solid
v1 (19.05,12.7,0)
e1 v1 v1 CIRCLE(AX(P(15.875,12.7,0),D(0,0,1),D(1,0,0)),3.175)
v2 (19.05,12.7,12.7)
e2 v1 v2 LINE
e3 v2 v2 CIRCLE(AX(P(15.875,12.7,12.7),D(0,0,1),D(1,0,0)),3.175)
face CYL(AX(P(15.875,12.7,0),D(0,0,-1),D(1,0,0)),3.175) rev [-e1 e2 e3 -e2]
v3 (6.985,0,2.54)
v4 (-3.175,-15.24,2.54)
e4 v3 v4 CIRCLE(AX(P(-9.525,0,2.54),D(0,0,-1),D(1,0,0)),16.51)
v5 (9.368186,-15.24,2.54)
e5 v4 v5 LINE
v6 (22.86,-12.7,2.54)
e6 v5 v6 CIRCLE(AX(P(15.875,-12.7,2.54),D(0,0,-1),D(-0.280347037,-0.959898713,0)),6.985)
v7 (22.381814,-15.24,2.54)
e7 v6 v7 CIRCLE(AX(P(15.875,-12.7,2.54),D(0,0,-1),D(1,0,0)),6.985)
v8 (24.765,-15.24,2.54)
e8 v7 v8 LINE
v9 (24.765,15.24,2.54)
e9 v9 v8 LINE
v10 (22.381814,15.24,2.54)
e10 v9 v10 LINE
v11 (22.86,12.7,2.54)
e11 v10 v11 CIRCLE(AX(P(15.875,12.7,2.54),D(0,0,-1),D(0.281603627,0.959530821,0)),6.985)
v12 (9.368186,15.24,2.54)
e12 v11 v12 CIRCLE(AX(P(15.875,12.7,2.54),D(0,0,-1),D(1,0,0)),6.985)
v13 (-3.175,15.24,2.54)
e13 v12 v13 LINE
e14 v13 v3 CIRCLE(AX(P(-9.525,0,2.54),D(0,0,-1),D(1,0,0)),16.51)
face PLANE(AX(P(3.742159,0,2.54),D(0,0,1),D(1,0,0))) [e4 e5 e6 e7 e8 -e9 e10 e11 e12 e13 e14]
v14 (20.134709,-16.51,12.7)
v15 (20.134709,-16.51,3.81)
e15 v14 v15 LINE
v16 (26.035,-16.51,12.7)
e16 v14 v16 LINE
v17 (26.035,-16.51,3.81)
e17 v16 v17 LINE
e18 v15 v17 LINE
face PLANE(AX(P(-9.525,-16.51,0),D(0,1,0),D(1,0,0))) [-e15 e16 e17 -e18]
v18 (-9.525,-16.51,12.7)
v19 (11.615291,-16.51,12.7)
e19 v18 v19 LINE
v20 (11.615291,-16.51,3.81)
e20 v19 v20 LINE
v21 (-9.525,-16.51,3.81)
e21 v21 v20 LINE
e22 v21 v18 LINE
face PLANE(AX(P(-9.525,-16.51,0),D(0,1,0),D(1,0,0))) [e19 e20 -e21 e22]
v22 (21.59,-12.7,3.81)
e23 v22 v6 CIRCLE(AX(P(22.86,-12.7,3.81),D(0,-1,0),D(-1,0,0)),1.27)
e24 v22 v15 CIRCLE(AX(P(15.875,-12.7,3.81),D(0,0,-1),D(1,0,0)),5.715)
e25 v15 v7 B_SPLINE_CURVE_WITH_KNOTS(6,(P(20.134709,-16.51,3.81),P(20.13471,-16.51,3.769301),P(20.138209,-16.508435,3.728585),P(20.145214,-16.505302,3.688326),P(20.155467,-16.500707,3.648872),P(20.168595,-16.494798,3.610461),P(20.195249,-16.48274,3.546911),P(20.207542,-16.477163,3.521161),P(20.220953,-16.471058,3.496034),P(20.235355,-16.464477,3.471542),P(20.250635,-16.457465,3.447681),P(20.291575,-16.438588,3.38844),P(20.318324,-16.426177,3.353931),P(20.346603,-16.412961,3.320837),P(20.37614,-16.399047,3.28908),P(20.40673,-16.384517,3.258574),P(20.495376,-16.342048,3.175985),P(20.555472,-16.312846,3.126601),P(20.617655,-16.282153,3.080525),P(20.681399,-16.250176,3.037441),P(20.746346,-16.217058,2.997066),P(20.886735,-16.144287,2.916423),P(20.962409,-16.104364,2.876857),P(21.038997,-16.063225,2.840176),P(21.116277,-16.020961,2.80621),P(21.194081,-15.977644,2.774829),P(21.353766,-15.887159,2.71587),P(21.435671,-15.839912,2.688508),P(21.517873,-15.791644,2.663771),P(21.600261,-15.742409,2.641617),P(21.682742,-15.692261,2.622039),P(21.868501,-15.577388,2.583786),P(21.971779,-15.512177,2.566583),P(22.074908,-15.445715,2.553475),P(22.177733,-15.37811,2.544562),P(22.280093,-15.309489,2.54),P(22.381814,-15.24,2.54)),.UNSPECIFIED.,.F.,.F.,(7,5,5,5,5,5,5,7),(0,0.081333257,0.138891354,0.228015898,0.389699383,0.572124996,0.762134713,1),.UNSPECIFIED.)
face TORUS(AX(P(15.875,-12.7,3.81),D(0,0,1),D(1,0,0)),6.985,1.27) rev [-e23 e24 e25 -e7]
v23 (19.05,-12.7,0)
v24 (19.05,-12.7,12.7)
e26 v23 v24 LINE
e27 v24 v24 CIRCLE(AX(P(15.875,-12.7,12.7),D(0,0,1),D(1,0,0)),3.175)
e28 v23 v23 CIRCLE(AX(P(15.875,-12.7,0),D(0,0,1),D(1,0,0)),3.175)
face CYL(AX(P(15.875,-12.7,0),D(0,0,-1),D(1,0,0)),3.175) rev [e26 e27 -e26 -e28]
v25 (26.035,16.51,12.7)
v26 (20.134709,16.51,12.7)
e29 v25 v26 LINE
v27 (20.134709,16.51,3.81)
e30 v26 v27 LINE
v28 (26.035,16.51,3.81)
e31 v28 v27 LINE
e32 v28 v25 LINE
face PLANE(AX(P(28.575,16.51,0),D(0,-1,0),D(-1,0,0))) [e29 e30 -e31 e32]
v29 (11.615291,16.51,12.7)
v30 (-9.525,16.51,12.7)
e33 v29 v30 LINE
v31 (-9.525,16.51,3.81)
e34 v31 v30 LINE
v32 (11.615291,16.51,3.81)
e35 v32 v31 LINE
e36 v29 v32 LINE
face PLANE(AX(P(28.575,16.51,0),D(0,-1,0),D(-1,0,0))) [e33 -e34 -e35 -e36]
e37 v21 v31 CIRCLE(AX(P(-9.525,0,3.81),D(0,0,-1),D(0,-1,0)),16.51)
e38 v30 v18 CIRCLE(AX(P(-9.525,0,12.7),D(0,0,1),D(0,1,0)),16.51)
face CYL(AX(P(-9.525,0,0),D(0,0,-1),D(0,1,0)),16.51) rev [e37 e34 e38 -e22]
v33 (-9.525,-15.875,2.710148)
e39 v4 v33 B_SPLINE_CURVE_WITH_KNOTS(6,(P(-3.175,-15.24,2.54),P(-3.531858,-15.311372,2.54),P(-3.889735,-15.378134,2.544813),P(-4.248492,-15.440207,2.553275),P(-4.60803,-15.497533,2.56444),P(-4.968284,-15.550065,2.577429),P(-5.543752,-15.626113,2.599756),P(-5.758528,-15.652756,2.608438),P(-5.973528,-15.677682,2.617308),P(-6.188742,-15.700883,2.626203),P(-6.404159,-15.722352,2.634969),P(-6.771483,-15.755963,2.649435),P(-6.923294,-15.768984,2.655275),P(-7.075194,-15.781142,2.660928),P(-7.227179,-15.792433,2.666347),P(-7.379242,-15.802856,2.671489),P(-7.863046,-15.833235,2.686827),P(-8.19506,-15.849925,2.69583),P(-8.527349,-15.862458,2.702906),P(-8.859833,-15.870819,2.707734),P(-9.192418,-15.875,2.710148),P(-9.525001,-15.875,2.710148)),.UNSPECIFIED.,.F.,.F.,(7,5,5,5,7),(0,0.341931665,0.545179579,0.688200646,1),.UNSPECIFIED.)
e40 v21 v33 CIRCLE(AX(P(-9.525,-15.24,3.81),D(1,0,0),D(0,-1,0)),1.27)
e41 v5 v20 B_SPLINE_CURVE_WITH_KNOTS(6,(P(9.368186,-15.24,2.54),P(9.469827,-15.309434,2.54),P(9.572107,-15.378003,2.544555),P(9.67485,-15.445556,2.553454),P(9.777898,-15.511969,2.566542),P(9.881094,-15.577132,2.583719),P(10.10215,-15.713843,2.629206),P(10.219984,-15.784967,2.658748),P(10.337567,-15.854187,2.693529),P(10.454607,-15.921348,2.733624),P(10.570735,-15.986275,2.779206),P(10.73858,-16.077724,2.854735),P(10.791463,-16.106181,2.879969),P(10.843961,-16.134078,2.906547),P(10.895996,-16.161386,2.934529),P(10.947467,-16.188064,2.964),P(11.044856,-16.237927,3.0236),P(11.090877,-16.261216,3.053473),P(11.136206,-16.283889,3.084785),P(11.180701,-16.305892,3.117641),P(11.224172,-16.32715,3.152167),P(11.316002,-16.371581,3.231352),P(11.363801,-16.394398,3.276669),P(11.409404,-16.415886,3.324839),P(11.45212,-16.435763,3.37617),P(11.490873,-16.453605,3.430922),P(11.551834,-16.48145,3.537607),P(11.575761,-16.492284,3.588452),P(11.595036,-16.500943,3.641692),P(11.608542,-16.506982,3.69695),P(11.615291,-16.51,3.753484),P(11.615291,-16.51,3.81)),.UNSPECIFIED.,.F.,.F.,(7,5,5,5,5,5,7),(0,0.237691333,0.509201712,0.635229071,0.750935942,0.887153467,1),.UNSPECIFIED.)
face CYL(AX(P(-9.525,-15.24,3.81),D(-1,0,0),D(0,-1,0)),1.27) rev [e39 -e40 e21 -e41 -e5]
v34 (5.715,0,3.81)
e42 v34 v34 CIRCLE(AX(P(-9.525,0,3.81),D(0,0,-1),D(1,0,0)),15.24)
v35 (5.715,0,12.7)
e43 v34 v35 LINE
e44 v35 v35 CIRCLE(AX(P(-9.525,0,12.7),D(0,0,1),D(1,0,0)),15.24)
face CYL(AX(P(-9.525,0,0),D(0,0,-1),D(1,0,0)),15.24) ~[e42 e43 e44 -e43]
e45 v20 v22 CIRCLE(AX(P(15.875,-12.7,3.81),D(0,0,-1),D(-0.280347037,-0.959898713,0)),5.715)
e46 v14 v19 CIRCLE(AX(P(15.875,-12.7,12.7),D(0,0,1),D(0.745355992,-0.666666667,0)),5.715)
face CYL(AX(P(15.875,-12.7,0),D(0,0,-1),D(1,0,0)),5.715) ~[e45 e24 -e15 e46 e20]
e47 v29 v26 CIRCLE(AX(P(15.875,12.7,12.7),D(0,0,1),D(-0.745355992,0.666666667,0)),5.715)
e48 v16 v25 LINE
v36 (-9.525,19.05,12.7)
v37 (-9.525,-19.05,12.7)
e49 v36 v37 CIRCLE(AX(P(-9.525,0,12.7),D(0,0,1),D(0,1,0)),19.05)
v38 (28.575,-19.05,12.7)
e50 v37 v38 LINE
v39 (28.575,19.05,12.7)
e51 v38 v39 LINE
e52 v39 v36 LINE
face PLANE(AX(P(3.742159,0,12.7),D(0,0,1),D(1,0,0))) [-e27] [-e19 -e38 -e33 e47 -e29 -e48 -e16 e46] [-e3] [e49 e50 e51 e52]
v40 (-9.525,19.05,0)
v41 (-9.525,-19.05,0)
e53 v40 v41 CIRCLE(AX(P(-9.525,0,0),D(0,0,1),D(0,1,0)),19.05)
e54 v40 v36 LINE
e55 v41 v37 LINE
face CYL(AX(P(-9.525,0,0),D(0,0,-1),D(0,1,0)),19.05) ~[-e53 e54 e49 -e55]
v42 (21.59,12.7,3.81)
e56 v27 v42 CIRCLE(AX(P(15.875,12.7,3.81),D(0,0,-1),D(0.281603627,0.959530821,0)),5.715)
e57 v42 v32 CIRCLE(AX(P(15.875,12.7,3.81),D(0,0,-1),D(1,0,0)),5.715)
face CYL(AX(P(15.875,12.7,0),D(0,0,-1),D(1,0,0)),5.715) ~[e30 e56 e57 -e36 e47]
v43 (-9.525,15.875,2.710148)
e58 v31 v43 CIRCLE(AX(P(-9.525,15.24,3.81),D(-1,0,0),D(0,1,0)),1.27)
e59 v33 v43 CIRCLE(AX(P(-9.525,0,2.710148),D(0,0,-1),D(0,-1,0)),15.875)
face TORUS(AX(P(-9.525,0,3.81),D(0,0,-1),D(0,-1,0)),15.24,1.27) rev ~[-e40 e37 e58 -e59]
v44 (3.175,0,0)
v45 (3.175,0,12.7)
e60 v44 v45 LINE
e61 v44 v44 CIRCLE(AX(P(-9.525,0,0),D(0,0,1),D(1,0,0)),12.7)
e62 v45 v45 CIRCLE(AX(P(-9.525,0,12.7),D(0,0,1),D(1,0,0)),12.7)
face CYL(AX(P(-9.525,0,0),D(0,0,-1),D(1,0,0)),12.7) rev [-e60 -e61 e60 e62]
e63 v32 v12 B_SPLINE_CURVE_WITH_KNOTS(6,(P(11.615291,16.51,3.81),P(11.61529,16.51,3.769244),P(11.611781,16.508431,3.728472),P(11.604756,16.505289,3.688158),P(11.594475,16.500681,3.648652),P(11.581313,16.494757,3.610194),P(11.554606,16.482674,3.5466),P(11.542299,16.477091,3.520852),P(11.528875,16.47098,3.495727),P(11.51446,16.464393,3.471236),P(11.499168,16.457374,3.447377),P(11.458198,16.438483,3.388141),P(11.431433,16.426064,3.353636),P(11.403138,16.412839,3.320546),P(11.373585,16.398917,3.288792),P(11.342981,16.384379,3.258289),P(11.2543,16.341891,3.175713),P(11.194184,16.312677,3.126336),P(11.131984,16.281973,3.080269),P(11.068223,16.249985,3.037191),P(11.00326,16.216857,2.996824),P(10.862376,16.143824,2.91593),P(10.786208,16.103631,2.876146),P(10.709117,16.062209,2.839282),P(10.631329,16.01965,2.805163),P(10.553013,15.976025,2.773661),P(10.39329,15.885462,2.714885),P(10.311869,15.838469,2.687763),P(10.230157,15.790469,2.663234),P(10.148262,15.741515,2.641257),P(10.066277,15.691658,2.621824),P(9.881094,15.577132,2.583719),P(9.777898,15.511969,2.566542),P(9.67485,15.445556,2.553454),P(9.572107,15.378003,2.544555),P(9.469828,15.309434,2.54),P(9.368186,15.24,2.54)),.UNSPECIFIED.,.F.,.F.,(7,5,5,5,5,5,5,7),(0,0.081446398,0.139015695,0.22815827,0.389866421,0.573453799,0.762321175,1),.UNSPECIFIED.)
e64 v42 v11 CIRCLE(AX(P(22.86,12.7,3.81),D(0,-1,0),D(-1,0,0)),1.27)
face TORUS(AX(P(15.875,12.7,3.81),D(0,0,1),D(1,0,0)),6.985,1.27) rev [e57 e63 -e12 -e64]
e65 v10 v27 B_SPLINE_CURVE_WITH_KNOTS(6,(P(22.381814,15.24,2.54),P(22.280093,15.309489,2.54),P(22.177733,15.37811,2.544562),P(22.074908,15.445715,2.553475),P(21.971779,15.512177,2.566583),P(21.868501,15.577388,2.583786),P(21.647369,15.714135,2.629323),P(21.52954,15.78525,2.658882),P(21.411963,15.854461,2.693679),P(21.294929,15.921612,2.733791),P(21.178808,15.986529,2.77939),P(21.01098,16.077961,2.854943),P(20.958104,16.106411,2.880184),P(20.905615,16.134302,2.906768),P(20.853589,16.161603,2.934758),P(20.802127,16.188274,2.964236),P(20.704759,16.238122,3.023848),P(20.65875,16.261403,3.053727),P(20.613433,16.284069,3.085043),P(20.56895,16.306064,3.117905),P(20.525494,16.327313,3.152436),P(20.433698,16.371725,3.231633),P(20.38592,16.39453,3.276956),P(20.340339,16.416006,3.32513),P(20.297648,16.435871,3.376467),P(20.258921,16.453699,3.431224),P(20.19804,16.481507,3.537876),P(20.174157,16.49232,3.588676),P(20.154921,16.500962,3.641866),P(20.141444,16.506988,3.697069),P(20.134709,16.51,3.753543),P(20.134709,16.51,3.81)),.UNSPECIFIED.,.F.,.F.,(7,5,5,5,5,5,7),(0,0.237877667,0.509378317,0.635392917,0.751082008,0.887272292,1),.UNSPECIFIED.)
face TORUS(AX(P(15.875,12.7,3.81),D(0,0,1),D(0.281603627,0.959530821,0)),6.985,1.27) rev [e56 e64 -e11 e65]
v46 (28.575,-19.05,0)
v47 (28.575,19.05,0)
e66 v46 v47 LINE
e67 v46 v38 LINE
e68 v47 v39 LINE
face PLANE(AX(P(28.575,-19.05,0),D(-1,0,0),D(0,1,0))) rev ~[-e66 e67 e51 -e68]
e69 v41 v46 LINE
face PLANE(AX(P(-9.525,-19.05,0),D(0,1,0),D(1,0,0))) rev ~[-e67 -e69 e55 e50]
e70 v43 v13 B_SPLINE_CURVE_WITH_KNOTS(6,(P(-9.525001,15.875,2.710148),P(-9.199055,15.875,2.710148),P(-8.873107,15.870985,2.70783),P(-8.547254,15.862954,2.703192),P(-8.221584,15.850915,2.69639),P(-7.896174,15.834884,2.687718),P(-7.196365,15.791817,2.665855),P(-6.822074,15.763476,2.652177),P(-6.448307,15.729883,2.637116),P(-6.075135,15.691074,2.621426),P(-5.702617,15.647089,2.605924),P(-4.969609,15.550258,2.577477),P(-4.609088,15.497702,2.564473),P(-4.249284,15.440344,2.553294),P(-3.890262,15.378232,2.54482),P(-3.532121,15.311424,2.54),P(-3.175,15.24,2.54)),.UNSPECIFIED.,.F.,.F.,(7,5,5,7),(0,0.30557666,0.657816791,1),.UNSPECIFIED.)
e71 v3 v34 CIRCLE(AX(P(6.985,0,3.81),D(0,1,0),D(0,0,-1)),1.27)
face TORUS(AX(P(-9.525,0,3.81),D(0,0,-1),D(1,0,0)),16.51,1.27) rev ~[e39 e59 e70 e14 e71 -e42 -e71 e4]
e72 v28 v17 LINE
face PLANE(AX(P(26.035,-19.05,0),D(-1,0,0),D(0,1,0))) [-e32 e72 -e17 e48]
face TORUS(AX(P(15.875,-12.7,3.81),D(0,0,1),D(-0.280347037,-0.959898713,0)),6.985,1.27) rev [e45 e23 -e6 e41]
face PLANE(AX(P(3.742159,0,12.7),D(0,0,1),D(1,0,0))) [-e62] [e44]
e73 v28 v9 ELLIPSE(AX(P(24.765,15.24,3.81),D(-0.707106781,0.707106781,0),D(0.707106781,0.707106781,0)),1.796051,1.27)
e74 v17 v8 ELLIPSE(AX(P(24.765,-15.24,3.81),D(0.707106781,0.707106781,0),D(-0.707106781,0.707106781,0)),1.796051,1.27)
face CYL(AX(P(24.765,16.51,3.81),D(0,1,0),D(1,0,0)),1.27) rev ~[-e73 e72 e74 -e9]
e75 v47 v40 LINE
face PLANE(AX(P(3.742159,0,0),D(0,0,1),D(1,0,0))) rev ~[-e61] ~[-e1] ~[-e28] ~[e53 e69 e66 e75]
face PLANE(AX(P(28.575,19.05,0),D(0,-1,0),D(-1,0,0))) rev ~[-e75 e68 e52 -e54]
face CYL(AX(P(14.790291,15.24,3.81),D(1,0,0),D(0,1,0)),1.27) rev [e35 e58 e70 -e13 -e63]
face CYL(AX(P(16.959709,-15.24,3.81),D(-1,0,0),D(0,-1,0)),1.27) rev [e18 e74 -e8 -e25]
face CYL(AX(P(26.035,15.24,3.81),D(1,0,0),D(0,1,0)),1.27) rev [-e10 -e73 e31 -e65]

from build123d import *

# Parameters (mm, degrees)
F0_R         = 3.175
F0_R_2       = 12.7
F1_DEPTH     = 12.7
F2_T         = -2.54
F3_T1_DEPTH  = 33.02
F3_T6_DEPTH  = 24.3152905029
F3_S7_R      = 5.715
F3_T8_DEPTH  = 14
F3_T12_ANGLE = 253.7190819507
F3_T17_ANGLE = 73.6440624835
F3_T22_DEPTH = 9.0752905029
F3_S23_R     = 5.715
F3_T24_DEPTH = 6
F3_T28_DEPTH = 9.0752905029
F3_S29_R     = 5.715
F3_T30_DEPTH = 6
F3_T34_ANGLE = 73.6440624835
F3_T39_ANGLE = 253.7190819507
F3_T44_DEPTH = 24.3152905029
F3_S45_R     = 5.715
F3_T46_DEPTH = 14
F3_T48_ANGLE = 180


# Not quite as in the source:
# - a fillet or chamfer that OpenCascade refuses, or shapes differently, is made with other operations: its cross-section is extruded or revolved along the edge and cut away or added


with BuildPart() as f1:
    # F0 (on Top) → F1 (new body)
    with BuildSketch(Plane.XY):
        with BuildLine():
            Line((28.575, -19.05), (28.575, 19.05))
            Line((28.575, 19.05), (-9.525, 19.05))
            ThreePointArc((-9.525, 19.05), (-28.575, 0), (-9.525, -19.05))
            Line((-9.525, -19.05), (28.575, -19.05))
        make_face()
        with Locations((15.875, -12.7)):
            Circle(F0_R, mode=Mode.SUBTRACT)
        with Locations((-9.525, 0)):
            Circle(F0_R_2, mode=Mode.SUBTRACT)
        with Locations((15.875, 12.7)):
            Circle(F0_R, mode=Mode.SUBTRACT)
    extrude(amount=F1_DEPTH)

    # F2
    f2_openings = [f1.faces().sort_by_distance(p)[0] for p in [
        (5.241716, 0, 12.7),
    ]]
    offset(amount=F2_T, openings=f2_openings)

    # F3: fillet of radius 1.27 on 11 edges, made by hand

    # F3_s2 → F3_t1 (join)
    with BuildSketch(Plane.XZ.offset(-16.51)):
        with BuildLine():
            ThreePointArc((26.035, 3.81), (25.6630256121, 2.9119743879), (24.765, 2.54))
            Line((24.765, 2.54), (26.035, 2.54))
            Line((26.035, 2.54), (26.035, 3.81))
        make_face()
    extrude(amount=F3_T1_DEPTH)


with BuildPart() as f3_tool4:
    # F3_s5 → F3_t6 (new body)
    with BuildSketch(Plane.YZ.offset(-9.525)):
        with BuildLine():
            ThreePointArc((-16.51, 3.81), (-16.1380256121, 2.9119743879), (-15.24, 2.54))
            Line((-15.24, 2.54), (-16.51, 2.54))
            Line((-16.51, 2.54), (-16.51, 3.81))
        make_face()
    extrude(amount=F3_T6_DEPTH)

    # F3_s7 → F3_t8 (cut, symmetric)
    with BuildSketch(Plane.XY.offset(3.2)):
        with Locations((15.875, -12.7)):
            Circle(F3_S7_R)
    extrude(amount=F3_T8_DEPTH, both=True, mode=Mode.SUBTRACT)


with BuildPart() as f1_1:
    add(f1.part)

    # F3_t3: union F3_tool4
    add(f3_tool4.part)


with BuildPart() as f3_tool10:
    # F3_s11 → F3_t12 (revolve)
    with BuildSketch(Plane(origin=(18.0449433807, -5.2701877221, 0), x_dir=(0, 0, 1), z_dir=(0.9598987128, -0.2803470371, 0))):
        with BuildLine():
            ThreePointArc((3.81, 13.4552044392), (2.9119743879, 13.8271788271), (2.54, 14.7252044392))
            Line((2.54, 14.7252044392), (2.54, 13.4552044392))
            Line((2.54, 13.4552044392), (3.81, 13.4552044392))
        make_face()
    revolve(axis=Axis((15.875, -12.7, 2.54), (0, 0, -1)), revolution_arc=F3_T12_ANGLE)

    split(bisect_by=Plane.XZ.offset(16.51), keep=Keep.BOTTOM)


with BuildPart() as f1_2:
    add(f1_1.part)

    # F3_t9: union F3_tool10
    add(f3_tool10.part)


with BuildPart() as f3_tool15:
    # F3_s16 → F3_t17 (revolve)
    with BuildSketch(Plane.XZ.offset(12.7)):
        with BuildLine():
            ThreePointArc((21.59, 3.81), (21.9619743879, 2.9119743879), (22.86, 2.54))
            Line((22.86, 2.54), (21.59, 2.54))
            Line((21.59, 2.54), (21.59, 3.81))
        make_face()
    revolve(axis=Axis((15.875, -12.7, 2.54), (0, 0, -1)), revolution_arc=F3_T17_ANGLE)

    split(bisect_by=Plane.XZ.offset(16.51), keep=Keep.BOTTOM)


with BuildPart() as f1_3:
    add(f1_2.part)

    # F3_t14: union F3_tool15
    add(f3_tool15.part)


with BuildPart() as f3_tool20:
    # F3_s21 → F3_t22 (new body)
    with BuildSketch(Plane.YZ.offset(16.9597094971)):
        with BuildLine():
            ThreePointArc((-16.51, 3.81), (-16.1380256121, 2.9119743879), (-15.24, 2.54))
            Line((-15.24, 2.54), (-16.51, 2.54))
            Line((-16.51, 2.54), (-16.51, 3.81))
        make_face()
    extrude(amount=F3_T22_DEPTH)

    # F3_s23 → F3_t24 (cut, symmetric)
    with BuildSketch(Plane.XY.offset(3.2)):
        with Locations((15.875, -12.7)):
            Circle(F3_S23_R)
    extrude(amount=F3_T24_DEPTH, both=True, mode=Mode.SUBTRACT)


with BuildPart() as f1_4:
    add(f1_3.part)

    # F3_t19: union F3_tool20
    add(f3_tool20.part)


with BuildPart() as f3_tool26:
    # F3_s27 → F3_t28 (new body)
    with BuildSketch(Plane.YZ.offset(26.035)):
        with BuildLine():
            ThreePointArc((16.51, 3.81), (16.1380256121, 2.9119743879), (15.24, 2.54))
            Line((15.24, 2.54), (16.51, 2.54))
            Line((16.51, 2.54), (16.51, 3.81))
        make_face()
    extrude(amount=-F3_T28_DEPTH)

    # F3_s29 → F3_t30 (cut, symmetric)
    with BuildSketch(Plane.XY.offset(3.2)):
        with Locations((15.875, 12.7)):
            Circle(F3_S29_R)
    extrude(amount=F3_T30_DEPTH, both=True, mode=Mode.SUBTRACT)


with BuildPart() as f1_5:
    add(f1_4.part)

    # F3_t25: union F3_tool26
    add(f3_tool26.part)


with BuildPart() as f3_tool32:
    # F3_s33 → F3_t34 (revolve)
    with BuildSketch(Plane(origin=(11.1844694654, -3.2824241778, 0), x_dir=(0, 0, 1), z_dir=(-0.9595308214, 0.281603627, 0))):
        with BuildLine():
            ThreePointArc((3.81, 22.3714990108), (2.9119743879, 22.7434733987), (2.54, 23.6414990108))
            Line((2.54, 23.6414990108), (2.54, 22.3714990108))
            Line((2.54, 22.3714990108), (3.81, 22.3714990108))
        make_face()
    revolve(axis=Axis((15.875, 12.7, 2.54), (0, 0, -1)), revolution_arc=F3_T34_ANGLE)

    split(bisect_by=Plane.XZ.offset(-16.51), keep=Keep.TOP)


with BuildPart() as f1_6:
    add(f1_5.part)

    # F3_t31: union F3_tool32
    add(f3_tool32.part)


with BuildPart() as f3_tool37:
    # F3_s38 → F3_t39 (revolve)
    with BuildSketch(Plane.XZ.offset(-12.7)):
        with BuildLine():
            ThreePointArc((21.59, 3.81), (21.9619743879, 2.9119743879), (22.86, 2.54))
            Line((22.86, 2.54), (21.59, 2.54))
            Line((21.59, 2.54), (21.59, 3.81))
        make_face()
    revolve(axis=Axis((15.875, 12.7, 2.54), (0, 0, -1)), revolution_arc=F3_T39_ANGLE)

    split(bisect_by=Plane.XZ.offset(-16.51), keep=Keep.TOP)


with BuildPart() as f1_7:
    add(f1_6.part)

    # F3_t36: union F3_tool37
    add(f3_tool37.part)


with BuildPart() as f3_tool42:
    # F3_s43 → F3_t44 (new body)
    with BuildSketch(Plane.YZ.offset(14.7902905029)):
        with BuildLine():
            ThreePointArc((16.51, 3.81), (16.1380256121, 2.9119743879), (15.24, 2.54))
            Line((15.24, 2.54), (16.51, 2.54))
            Line((16.51, 2.54), (16.51, 3.81))
        make_face()
    extrude(amount=-F3_T44_DEPTH)

    # F3_s45 → F3_t46 (cut, symmetric)
    with BuildSketch(Plane.XY.offset(3.2)):
        with Locations((15.875, 12.7)):
            Circle(F3_S45_R)
    extrude(amount=F3_T46_DEPTH, both=True, mode=Mode.SUBTRACT)


with BuildPart() as f1_8:
    add(f1_7.part)

    # F3_t41: union F3_tool42
    add(f3_tool42.part)

    # F3_s47 → F3_t48 (revolve)
    with BuildSketch(Plane.YZ.offset(-9.525)):
        with BuildLine():
            ThreePointArc((-16.51, 3.81), (-16.1380256121, 2.9119743879), (-15.24, 2.54))
            Line((-15.24, 2.54), (-16.51, 2.54))
            Line((-16.51, 2.54), (-16.51, 3.81))
        make_face()
    revolve(axis=Axis((-9.525, 0, 2.54), (0, 0, -1)), revolution_arc=F3_T48_ANGLE)

    # F3_s49 → F3_t50 (revolve)
    with BuildSketch(Plane.XZ):
        with BuildLine():
            ThreePointArc((6.985, 2.54), (6.0869743879, 2.9119743879), (5.715, 3.81))
            Line((5.715, 3.81), (5.715, 2.54))
            Line((5.715, 2.54), (6.985, 2.54))
        make_face()
    revolve(axis=Axis((-9.525, 0, 2.54), (0, 0, -1)))


solid = f1_8.part
